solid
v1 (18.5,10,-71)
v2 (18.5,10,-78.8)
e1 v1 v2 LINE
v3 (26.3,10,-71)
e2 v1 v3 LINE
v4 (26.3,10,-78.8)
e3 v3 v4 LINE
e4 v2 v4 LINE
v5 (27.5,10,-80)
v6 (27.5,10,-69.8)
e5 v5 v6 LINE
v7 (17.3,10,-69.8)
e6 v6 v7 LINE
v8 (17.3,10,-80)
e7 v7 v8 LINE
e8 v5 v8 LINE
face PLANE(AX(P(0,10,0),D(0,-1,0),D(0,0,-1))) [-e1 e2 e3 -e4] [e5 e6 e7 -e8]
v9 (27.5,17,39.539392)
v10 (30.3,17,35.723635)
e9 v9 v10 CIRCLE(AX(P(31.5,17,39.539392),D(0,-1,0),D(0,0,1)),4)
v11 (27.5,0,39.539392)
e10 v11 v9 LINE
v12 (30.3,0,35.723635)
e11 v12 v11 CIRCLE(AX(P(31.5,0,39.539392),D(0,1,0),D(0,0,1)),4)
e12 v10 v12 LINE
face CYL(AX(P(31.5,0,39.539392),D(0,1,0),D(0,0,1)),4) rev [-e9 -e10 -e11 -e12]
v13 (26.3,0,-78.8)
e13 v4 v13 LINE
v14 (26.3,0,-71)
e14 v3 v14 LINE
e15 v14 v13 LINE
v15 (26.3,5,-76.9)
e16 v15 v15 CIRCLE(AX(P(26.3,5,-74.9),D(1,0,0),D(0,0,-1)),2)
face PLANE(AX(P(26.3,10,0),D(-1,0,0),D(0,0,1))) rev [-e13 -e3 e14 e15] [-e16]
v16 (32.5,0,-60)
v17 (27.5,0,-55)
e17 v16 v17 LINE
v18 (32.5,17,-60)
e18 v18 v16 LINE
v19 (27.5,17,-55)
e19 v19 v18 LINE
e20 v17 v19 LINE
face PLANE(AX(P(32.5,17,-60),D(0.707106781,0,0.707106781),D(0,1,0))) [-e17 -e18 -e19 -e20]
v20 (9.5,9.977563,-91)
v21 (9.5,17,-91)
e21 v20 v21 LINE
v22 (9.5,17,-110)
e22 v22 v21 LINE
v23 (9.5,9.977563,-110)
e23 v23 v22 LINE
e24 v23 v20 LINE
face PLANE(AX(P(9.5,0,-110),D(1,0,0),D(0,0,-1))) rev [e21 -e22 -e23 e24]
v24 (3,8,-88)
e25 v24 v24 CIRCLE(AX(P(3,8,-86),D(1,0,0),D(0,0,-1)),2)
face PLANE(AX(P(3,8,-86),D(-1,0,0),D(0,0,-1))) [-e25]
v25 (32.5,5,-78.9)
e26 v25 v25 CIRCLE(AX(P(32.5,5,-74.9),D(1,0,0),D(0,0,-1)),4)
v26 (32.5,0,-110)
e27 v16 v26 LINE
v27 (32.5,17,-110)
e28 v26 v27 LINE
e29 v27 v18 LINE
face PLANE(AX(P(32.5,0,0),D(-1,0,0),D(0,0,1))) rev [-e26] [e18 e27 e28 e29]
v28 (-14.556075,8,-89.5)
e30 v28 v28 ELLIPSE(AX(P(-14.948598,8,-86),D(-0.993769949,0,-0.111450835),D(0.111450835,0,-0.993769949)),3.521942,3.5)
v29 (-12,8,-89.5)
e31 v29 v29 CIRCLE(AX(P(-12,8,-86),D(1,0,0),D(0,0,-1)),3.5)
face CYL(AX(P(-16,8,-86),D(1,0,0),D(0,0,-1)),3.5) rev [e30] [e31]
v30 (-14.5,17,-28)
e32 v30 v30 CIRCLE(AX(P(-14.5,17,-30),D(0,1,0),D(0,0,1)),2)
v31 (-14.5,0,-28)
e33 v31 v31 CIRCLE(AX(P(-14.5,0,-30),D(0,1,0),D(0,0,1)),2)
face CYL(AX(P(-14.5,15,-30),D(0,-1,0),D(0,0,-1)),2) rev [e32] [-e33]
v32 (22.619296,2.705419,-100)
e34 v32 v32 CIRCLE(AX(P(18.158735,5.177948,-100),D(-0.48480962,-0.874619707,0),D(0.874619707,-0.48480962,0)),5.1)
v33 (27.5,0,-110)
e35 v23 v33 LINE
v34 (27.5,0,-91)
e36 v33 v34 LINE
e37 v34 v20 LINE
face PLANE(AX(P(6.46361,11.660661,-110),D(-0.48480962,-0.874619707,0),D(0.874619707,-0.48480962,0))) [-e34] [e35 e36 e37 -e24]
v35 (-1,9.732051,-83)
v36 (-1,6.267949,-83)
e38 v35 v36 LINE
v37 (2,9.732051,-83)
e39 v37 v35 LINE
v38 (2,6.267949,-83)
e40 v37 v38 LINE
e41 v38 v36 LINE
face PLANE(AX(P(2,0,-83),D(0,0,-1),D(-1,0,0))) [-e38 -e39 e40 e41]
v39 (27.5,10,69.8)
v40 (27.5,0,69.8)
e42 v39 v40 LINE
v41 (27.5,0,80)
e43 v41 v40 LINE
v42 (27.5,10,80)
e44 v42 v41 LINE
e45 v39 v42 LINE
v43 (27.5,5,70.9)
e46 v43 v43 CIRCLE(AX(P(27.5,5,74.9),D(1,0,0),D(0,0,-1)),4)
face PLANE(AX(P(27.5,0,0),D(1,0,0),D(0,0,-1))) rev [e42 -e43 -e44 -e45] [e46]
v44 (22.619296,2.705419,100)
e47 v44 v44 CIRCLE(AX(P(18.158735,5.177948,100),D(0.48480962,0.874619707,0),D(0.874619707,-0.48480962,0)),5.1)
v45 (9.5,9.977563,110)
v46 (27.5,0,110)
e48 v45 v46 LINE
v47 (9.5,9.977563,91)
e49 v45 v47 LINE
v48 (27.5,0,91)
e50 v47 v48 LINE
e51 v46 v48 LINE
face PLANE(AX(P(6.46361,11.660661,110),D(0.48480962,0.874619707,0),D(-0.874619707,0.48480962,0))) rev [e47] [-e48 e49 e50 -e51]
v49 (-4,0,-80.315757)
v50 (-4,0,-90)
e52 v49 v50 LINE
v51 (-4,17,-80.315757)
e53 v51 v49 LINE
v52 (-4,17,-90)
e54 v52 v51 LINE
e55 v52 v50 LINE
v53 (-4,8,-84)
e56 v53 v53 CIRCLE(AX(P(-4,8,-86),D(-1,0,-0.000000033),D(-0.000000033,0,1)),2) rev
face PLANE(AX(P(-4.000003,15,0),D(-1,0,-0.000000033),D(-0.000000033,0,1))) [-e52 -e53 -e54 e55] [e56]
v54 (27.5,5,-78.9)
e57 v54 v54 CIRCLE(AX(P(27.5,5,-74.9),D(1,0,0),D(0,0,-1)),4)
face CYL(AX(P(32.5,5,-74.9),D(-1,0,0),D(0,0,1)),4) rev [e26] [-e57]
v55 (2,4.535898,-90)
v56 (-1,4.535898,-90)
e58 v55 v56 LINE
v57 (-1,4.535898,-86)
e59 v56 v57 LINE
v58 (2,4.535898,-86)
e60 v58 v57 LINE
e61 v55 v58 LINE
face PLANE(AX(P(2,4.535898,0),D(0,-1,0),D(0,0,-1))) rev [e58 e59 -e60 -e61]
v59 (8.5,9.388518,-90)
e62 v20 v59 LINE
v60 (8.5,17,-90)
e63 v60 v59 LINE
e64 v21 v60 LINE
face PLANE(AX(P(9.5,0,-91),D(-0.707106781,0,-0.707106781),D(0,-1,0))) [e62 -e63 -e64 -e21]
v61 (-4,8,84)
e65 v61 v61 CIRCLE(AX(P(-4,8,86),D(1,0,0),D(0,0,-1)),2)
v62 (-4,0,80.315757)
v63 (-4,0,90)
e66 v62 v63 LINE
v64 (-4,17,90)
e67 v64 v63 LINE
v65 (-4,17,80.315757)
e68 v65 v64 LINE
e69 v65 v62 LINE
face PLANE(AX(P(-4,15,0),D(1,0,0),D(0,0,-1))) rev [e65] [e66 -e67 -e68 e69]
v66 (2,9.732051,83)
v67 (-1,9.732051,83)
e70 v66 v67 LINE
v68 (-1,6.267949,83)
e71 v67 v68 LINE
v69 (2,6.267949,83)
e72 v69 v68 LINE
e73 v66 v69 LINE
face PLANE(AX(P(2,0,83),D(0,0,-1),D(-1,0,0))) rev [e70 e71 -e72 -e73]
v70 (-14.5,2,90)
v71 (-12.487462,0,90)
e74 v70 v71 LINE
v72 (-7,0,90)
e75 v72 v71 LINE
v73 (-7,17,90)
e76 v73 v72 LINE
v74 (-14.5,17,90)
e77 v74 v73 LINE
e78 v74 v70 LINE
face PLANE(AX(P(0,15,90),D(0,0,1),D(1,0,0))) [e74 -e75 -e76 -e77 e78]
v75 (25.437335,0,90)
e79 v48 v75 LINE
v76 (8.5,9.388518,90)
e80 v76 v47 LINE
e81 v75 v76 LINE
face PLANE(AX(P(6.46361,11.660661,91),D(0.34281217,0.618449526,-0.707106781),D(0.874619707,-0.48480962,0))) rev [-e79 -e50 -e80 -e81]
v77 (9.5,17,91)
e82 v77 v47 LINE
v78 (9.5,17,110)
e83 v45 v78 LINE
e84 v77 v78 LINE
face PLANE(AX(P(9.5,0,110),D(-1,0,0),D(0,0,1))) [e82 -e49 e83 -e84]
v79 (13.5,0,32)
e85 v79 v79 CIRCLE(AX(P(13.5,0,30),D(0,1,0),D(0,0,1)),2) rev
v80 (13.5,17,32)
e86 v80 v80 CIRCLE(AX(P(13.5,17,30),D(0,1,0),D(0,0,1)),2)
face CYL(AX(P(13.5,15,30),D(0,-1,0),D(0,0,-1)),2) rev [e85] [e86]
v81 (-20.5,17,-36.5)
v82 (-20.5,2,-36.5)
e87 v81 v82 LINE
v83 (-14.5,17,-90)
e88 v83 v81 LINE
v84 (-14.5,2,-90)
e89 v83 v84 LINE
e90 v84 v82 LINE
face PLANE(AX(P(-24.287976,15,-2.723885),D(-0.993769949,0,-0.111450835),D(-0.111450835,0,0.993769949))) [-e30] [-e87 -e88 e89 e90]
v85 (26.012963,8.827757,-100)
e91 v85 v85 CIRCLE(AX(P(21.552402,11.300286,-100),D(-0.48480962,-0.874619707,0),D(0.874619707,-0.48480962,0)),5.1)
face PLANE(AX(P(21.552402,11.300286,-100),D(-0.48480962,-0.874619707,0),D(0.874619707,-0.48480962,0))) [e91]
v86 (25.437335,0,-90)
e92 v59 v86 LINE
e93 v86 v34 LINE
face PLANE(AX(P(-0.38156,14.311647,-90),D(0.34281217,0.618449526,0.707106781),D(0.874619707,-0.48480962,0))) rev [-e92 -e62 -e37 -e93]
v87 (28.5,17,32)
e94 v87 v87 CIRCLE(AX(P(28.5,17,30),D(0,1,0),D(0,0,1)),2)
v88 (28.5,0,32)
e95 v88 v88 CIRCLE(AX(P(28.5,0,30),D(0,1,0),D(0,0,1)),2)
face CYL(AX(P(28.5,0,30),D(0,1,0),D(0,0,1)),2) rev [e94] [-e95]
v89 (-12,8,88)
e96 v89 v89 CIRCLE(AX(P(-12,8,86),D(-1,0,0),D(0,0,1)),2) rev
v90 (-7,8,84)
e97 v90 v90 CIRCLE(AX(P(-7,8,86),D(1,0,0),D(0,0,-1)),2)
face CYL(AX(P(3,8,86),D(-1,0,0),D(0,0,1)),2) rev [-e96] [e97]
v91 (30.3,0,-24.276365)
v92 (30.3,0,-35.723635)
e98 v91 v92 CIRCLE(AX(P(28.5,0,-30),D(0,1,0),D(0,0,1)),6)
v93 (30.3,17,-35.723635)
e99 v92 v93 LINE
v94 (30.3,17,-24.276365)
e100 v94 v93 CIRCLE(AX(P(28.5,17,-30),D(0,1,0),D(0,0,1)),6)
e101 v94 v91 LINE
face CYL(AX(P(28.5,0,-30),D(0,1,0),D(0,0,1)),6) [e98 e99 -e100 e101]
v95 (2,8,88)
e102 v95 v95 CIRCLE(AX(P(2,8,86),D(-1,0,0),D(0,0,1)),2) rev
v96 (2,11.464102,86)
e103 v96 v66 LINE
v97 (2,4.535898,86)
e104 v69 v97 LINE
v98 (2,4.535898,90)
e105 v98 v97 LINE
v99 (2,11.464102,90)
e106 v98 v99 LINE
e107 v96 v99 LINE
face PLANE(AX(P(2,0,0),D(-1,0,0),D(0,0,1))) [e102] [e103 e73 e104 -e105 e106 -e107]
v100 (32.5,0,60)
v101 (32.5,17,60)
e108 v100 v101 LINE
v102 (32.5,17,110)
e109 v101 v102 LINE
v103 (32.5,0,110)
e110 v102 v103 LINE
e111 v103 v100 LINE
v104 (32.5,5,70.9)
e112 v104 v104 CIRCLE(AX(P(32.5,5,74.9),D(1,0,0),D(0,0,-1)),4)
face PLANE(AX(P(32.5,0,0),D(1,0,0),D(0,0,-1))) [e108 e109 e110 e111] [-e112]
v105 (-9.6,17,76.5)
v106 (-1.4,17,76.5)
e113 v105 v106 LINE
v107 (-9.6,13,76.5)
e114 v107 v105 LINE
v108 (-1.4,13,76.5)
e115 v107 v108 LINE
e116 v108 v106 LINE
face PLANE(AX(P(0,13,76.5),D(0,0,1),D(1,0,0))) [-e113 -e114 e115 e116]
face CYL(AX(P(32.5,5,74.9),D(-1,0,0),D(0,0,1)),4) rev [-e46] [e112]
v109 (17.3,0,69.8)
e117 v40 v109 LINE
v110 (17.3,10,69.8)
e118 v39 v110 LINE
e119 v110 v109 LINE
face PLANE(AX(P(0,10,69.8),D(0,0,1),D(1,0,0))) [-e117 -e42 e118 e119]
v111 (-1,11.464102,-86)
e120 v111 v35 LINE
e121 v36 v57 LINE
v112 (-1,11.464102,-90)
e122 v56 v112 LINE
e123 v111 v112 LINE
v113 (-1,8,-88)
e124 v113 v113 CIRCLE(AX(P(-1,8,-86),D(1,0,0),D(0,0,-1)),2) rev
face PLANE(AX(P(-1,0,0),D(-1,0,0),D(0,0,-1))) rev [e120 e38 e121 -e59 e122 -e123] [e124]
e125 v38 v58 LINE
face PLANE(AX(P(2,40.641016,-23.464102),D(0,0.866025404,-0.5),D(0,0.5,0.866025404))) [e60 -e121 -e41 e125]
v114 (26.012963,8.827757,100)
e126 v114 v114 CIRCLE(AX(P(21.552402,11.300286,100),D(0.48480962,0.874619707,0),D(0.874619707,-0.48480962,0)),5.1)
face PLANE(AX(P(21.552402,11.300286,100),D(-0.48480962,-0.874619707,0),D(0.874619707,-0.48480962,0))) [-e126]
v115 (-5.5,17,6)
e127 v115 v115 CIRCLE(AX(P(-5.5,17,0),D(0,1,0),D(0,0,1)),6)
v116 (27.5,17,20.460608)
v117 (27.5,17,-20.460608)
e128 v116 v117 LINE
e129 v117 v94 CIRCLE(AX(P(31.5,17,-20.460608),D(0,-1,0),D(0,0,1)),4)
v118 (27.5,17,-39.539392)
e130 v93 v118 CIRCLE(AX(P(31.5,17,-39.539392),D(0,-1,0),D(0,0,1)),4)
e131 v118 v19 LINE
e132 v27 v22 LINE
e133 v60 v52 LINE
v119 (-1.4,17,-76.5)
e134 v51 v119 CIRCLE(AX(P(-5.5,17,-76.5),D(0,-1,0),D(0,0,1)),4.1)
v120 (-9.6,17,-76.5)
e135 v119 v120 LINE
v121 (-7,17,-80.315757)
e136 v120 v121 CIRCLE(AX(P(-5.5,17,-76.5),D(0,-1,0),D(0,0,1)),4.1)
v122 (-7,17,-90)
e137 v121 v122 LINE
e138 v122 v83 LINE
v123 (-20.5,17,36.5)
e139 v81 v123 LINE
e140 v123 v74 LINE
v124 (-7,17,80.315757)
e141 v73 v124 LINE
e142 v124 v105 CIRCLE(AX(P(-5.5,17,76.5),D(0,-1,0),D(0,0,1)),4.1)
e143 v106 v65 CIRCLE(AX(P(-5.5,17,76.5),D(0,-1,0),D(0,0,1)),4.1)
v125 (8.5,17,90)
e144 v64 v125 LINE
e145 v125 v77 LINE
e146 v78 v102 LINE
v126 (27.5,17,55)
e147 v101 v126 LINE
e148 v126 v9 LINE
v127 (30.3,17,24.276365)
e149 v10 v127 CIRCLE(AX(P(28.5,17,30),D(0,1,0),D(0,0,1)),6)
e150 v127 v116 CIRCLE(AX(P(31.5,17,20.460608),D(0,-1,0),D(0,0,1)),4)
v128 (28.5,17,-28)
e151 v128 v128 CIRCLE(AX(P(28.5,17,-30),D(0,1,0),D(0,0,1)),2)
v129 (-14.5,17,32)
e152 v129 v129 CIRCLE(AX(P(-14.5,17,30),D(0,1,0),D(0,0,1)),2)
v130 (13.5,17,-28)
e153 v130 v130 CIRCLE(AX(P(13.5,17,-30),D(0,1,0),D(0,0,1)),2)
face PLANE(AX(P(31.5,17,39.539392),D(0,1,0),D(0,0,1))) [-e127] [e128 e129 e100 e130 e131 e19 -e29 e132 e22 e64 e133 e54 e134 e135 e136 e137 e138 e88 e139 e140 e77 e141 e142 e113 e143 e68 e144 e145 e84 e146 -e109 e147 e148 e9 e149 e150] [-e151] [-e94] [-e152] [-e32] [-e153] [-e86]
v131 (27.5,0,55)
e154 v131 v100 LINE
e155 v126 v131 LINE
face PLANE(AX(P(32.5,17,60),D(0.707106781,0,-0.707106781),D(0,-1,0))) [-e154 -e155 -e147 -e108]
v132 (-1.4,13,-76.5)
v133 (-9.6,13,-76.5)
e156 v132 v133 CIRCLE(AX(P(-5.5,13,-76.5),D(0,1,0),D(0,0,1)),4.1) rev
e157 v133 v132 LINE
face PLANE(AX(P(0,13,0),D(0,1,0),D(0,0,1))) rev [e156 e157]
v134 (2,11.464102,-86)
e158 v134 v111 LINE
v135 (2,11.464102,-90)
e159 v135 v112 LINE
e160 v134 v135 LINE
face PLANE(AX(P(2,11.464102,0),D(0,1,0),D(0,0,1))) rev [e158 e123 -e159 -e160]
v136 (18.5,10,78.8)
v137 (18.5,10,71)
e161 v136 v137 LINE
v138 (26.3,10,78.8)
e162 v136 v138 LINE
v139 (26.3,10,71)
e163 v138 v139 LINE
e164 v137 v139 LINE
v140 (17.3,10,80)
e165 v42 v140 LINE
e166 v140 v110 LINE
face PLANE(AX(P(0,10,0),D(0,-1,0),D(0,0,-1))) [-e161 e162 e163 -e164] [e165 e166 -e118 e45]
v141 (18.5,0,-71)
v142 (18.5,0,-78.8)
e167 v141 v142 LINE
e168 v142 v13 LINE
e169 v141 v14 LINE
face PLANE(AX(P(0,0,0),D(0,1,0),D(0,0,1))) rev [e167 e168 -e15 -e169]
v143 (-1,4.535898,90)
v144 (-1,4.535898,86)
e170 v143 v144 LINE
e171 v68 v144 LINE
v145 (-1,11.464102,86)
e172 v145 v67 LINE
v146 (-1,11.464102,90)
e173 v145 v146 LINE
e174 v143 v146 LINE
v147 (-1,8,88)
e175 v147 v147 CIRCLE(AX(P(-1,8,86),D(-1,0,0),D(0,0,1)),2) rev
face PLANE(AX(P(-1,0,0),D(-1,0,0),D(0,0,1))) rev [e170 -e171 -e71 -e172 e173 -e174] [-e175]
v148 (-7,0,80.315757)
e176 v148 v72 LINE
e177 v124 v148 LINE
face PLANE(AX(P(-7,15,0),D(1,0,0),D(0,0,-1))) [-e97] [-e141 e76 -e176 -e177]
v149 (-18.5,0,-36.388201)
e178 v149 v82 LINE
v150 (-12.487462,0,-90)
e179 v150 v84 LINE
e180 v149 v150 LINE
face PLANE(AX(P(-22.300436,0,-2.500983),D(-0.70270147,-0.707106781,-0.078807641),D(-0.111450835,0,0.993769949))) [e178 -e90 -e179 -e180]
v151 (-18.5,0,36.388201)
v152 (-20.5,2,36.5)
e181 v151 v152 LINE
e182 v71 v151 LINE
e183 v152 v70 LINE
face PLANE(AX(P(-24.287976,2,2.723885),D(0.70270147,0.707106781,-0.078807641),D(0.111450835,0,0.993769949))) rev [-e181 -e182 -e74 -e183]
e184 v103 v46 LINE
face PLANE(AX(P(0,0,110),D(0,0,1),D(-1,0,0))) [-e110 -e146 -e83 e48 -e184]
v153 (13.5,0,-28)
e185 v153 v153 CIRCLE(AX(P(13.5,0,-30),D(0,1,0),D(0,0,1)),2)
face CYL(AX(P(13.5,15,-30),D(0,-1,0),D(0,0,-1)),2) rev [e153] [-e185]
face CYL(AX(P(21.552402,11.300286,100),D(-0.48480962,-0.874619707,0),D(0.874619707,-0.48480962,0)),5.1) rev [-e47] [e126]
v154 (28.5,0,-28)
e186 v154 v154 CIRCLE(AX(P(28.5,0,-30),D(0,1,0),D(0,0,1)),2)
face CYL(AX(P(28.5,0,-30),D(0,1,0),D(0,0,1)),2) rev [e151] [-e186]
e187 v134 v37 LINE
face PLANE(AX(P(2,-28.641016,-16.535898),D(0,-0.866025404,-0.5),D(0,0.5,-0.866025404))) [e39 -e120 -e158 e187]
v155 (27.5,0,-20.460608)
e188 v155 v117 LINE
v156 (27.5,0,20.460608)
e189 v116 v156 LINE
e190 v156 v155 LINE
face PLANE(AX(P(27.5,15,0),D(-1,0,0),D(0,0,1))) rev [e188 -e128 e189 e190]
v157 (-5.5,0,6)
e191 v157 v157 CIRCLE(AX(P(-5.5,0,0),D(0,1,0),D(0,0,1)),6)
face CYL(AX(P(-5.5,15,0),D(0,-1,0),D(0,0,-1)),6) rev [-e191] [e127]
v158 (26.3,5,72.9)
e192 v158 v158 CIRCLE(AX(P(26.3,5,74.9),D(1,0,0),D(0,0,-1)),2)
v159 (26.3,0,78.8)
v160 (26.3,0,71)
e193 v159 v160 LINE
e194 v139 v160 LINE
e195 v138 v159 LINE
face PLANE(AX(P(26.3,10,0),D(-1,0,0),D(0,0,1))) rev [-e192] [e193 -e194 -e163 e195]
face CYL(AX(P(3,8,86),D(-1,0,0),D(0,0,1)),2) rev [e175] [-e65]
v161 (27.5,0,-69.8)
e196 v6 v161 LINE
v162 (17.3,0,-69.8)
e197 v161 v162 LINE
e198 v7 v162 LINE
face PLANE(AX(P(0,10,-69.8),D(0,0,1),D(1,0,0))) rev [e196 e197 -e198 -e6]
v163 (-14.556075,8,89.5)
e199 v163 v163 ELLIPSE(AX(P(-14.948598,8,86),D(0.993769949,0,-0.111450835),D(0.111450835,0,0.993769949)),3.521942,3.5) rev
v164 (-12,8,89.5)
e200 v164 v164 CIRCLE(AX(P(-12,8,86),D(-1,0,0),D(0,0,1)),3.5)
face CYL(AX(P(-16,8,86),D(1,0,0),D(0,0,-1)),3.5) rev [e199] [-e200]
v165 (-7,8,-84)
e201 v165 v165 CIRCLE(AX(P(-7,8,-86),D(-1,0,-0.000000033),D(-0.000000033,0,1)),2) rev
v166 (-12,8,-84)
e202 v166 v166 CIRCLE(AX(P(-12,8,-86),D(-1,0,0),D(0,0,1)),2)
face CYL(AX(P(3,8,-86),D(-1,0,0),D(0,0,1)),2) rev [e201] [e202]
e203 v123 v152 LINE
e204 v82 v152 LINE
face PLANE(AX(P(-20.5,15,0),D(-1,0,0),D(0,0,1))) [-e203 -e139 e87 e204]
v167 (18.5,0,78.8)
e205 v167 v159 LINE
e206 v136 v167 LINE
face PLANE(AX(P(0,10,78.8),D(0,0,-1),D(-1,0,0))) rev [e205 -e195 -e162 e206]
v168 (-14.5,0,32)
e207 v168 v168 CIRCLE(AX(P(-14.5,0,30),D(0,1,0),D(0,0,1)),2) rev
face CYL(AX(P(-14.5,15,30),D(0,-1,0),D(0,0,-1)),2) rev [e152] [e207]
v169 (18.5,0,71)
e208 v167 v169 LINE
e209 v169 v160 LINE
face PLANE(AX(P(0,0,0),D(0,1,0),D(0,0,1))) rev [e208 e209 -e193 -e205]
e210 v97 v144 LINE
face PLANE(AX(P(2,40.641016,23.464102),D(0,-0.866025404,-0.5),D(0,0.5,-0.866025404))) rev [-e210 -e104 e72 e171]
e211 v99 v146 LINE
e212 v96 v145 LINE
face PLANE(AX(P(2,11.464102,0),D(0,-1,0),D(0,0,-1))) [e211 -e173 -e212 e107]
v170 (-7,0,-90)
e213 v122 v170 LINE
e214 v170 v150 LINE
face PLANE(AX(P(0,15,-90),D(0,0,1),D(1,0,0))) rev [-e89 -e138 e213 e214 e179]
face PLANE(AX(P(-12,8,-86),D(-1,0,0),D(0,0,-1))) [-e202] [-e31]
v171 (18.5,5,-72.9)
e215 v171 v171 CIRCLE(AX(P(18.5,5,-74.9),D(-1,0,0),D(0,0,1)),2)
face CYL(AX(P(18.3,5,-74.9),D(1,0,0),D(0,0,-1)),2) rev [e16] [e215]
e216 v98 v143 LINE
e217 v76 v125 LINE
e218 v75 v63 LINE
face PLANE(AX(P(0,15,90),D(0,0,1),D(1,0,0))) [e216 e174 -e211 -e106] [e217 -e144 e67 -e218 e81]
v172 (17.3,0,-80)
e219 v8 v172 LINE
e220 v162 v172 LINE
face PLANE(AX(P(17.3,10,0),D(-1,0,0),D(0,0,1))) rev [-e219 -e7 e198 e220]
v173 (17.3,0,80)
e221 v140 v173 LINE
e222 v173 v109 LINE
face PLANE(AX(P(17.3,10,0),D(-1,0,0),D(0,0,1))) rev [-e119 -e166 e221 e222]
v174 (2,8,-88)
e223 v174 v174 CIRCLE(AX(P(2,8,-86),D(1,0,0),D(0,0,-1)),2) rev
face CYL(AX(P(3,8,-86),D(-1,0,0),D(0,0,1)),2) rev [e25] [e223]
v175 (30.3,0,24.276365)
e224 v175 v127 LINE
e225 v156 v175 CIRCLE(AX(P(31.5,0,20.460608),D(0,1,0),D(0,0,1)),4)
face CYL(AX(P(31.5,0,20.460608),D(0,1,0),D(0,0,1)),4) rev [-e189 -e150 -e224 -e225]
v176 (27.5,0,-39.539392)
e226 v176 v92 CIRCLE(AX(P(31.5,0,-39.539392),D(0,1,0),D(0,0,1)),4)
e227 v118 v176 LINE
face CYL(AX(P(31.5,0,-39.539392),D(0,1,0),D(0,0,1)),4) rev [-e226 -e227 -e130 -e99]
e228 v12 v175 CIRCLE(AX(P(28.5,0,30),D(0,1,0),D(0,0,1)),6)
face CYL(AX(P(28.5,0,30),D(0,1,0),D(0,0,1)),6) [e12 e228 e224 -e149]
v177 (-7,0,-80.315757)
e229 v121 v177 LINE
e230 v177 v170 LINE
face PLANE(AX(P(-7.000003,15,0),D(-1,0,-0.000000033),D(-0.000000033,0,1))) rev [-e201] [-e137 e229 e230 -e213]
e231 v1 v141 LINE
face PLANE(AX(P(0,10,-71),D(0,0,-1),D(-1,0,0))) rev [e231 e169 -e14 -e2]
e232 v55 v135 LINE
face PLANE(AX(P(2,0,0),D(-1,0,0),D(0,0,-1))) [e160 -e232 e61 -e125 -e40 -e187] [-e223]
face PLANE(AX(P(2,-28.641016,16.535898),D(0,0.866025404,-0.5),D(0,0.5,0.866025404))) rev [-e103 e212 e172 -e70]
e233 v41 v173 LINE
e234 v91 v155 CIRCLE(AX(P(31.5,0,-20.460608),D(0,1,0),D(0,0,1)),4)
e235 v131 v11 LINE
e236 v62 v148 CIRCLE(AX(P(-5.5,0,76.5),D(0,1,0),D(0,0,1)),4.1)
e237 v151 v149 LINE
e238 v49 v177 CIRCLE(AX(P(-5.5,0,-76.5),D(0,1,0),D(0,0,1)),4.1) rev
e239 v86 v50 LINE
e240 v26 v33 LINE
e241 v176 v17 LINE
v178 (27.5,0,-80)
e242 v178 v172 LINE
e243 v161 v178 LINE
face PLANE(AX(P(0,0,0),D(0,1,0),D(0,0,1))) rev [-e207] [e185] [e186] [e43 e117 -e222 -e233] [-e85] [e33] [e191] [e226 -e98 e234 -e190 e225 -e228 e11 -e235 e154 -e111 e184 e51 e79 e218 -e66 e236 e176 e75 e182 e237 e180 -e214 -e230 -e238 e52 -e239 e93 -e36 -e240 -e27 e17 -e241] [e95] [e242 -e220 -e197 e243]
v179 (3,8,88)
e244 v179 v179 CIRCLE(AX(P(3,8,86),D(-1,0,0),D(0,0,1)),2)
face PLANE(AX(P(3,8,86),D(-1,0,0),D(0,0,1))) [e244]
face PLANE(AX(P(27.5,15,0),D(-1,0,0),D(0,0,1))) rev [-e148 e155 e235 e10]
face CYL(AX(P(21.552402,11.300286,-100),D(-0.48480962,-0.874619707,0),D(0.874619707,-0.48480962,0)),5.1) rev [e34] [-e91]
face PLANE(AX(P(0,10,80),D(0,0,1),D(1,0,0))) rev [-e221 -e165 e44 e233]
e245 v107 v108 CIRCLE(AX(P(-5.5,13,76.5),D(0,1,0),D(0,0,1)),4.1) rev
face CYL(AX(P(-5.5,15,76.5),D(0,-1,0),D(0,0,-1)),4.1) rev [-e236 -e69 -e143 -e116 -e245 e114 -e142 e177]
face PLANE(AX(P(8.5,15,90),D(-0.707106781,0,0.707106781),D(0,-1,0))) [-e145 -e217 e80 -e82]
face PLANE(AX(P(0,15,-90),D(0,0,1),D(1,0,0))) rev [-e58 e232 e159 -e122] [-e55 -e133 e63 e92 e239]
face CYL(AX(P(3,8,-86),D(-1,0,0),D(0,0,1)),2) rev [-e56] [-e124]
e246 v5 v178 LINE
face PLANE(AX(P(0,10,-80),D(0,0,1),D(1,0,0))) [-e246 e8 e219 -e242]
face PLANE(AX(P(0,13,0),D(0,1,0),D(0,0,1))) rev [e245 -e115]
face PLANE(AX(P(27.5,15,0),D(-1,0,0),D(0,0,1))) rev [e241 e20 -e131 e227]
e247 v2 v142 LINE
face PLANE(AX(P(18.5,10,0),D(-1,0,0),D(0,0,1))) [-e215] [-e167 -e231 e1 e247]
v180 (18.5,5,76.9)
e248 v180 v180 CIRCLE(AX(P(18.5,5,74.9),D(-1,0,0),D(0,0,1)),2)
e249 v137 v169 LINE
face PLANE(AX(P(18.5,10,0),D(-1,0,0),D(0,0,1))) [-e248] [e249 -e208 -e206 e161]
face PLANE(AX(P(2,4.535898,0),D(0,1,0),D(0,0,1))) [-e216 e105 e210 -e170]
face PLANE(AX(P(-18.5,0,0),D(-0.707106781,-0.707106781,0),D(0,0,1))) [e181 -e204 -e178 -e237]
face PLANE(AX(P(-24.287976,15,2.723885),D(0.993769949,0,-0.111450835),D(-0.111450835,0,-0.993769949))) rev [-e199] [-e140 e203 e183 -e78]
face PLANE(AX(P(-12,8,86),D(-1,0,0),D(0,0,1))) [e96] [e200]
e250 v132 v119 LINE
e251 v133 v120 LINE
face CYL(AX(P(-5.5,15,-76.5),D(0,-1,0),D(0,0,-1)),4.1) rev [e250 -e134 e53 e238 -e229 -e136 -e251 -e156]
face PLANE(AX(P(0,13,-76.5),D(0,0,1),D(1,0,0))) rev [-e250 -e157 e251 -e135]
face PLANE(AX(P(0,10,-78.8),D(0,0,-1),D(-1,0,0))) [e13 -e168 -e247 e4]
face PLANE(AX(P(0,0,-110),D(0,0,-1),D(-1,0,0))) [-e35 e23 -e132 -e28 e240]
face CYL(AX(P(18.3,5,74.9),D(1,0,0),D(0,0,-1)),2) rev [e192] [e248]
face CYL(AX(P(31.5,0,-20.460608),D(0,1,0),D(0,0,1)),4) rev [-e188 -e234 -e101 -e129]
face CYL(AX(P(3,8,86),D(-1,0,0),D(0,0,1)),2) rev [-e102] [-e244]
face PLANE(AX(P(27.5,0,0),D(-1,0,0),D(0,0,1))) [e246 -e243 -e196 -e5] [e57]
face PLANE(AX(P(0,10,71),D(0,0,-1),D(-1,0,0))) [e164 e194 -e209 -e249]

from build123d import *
from build123d.topology import SkipClean

# Parameters (mm, degrees)
SZKIC1_R                    = 2
DODANIE_WYCI_GNI_CIE1_DEPTH = 15
DODANIE_WYCI_GNI_CIE3_START = -2
DODANIE_WYCI_GNI_CIE3_DEPTH = 2
DODANIE_WYCI_GNI_CIE4_DEPTH = 15
WYTNIJ_WYCI_GNI_CIE1_DEPTH  = 15
ZAOKR_GLENIE1_R             = 4
SFAZOWANIE1_SIZE            = 2
WYTNIJ_WYCI_GNI_CIE3_START  = -7
SZKIC8_R                    = 2
WYTNIJ_WYCI_GNI_CIE3_DEPTH  = 107.031561
WYTNIJ_WYCI_GNI_CIE4_START  = 8
SZKIC9_R                    = 3.5
WYTNIJ_WYCI_GNI_CIE4_DEPTH  = 4
WYTNIJ_WYCI_GNI_CIE5_START  = -6
SZKIC10_R                   = 2
WYTNIJ_WYCI_GNI_CIE5_DEPTH  = 3
SZKIC12_W                   = 10.2
SZKIC12_H                   = 10.2
SZKIC12_W_2                 = 7.8
SZKIC12_H_2                 = 7.8
WYTNIJ_WYCI_GNI_CIE7_DEPTH  = 10
SZKIC13_R                   = 2
WYTNIJ_WYCI_GNI_CIE8_DEPTH  = 8
DODANIE_WYCI_GNI_CIE5_DEPTH = 20
SZKIC15_R                   = 5.1
WYTNIJ_WYCI_GNI_CIE9_DEPTH  = 7
SFAZOWANIE2_SIZE            = 1
SZKIC17_R                   = 2
SZKIC17_R_2                 = 6
DODANIE_WYCI_GNI_CIE6_DEPTH = 2
SZKIC18_W                   = 50
SZKIC18_H                   = 17
SZKIC18_R                   = 4
DODANIE_WYCI_GNI_CIE7_DEPTH = 5
SFAZOWANIE3_SIZE            = 5


# Some blends are built 0.0001 mm under size
with BuildPart() as part:
    # Szkic1 → Dodanie-wyciągnięcie1 (new body)
    # profile 1 of 2: a face of its own
    with BuildSketch(Plane(origin=(0, 0, 0), x_dir=(1, 0, 0), z_dir=(0, 1, 0))):
        with BuildLine():
            Line((-11.5, 0), (-20.5, 0))
            Line((-20.5, 0), (-20.5, -36.5))
            Line((-20.5, -36.5), (-14.5, -90))
            Line((-14.5, -90), (-7, -90))
            Line((-7, -90), (-7, -80.315757))
            ThreePointArc((-7, -80.315757), (-7.808679, -73.111785), (-1.4, -76.5))
            ThreePointArc((-1.4, -76.5), (-2.111785, -78.808679), (-4, -80.315757))
            Line((-4, -80.315757), (-4, -90))
            Line((-4, -90), (27.5, -90))
            Line((27.5, -90), (27.5, 0))
            Line((27.5, 0), (0.5, 0))
            ThreePointArc((0.5, 0), (-5.5, -6), (-11.5, 0))
        make_face()
        with Locations(Location((-14.5, -30, 0), (0, 0, 270))):
            Circle(SZKIC1_R, mode=Mode.SUBTRACT)
        with Locations(Location((13.5, -30, 0), (0, 0, 270))):
            Circle(SZKIC1_R, mode=Mode.SUBTRACT)
    # profile 2 of 2: a face of its own
    with BuildSketch(Plane(origin=(0, 0, 0), x_dir=(1, 0, 0), z_dir=(0, 1, 0))):
        with BuildLine():
            Line((-14.5, 90), (-20.5, 36.5))
            Line((-20.5, 36.5), (-20.5, 0))
            Line((-20.5, 0), (-11.5, 0))
            ThreePointArc((-11.5, 0), (-5.5, 6), (0.5, 0))
            Line((0.5, 0), (27.5, 0))
            Line((27.5, 0), (27.5, 90))
            Line((27.5, 90), (-4, 90))
            Line((-4, 90), (-4, 80.315757))
            ThreePointArc((-4, 80.315757), (-2.111785, 78.808679), (-1.4, 76.5))
            ThreePointArc((-1.4, 76.5), (-7.808679, 73.111785), (-7, 80.315757))
            Line((-7, 80.315757), (-7, 90))
            Line((-7, 90), (-14.5, 90))
        make_face()
        with Locations(Location((-14.5, 30, 0), (0, 0, 270))):
            Circle(SZKIC1_R, mode=Mode.SUBTRACT)
        with Locations(Location((13.5, 30, 0), (0, 0, 270))):
            Circle(SZKIC1_R, mode=Mode.SUBTRACT)
    extrude(amount=DODANIE_WYCI_GNI_CIE1_DEPTH)

    # Szkic3 → Dodanie-wyciągnięcie3 (add)
    with BuildSketch(Plane(origin=(0, 15, 0), x_dir=(1, 0, 0), z_dir=(0, 1, 0)).offset(DODANIE_WYCI_GNI_CIE3_START)):
        with BuildLine():
            ThreePointArc((-1.4, -76.5), (-5.5, -72.4), (-9.6, -76.5))
            Line((-9.6, -76.5), (-1.4, -76.5))
        make_face()
        with BuildLine():
            Line((-1.4, 76.5), (-9.6, 76.5))
            ThreePointArc((-9.6, 76.5), (-5.5, 72.4), (-1.4, 76.5))
        make_face()
    extrude(amount=DODANIE_WYCI_GNI_CIE3_DEPTH)

    # Szkic4 → Dodanie-wyciągnięcie4 (add)
    with BuildSketch(Plane(origin=(0, 15, 0), x_dir=(1, 0, 0), z_dir=(0, 1, 0))):
        with BuildLine():
            ThreePointArc((27.5, -28.267949), (29.5, -28.267949), (30.5, -30))
            ThreePointArc((30.5, -30), (29.5, -31.732051), (27.5, -31.732051))
            Line((27.5, -31.732051), (27.5, -35.91608))
            ThreePointArc((27.5, -35.91608), (32.372983, -34.582576), (34.5, -30))
            ThreePointArc((34.5, -30), (32.372983, -25.417424), (27.5, -24.08392))
            Line((27.5, -24.08392), (27.5, -28.267949))
        make_face()
        with BuildLine():
            ThreePointArc((27.5, -31.732051), (26.5, -30), (27.5, -28.267949))
            Line((27.5, -28.267949), (27.5, -24.08392))
            ThreePointArc((27.5, -24.08392), (22.5, -30), (27.5, -35.91608))
            Line((27.5, -35.91608), (27.5, -31.732051))
        make_face()
        with BuildLine():
            ThreePointArc((27.5, 35.91608), (22.5, 30), (27.5, 24.08392))
            Line((27.5, 24.08392), (27.5, 28.267949))
            ThreePointArc((27.5, 28.267949), (26.5, 30), (27.5, 31.732051))
            Line((27.5, 31.732051), (27.5, 35.91608))
        make_face()
        with BuildLine():
            Line((27.5, 28.267949), (27.5, 24.08392))
            ThreePointArc((27.5, 24.08392), (32.372983, 25.417424), (34.5, 30))
            ThreePointArc((34.5, 30), (32.372983, 34.582576), (27.5, 35.91608))
            Line((27.5, 35.91608), (27.5, 31.732051))
            ThreePointArc((27.5, 31.732051), (29.5, 31.732051), (30.5, 30))
            ThreePointArc((30.5, 30), (29.5, 28.267949), (27.5, 28.267949))
        make_face()
    extrude(amount=-DODANIE_WYCI_GNI_CIE4_DEPTH)

    # Szkic5 → Wytnij-wyciągnięcie1 (cut)
    with SkipClean():  # the faces are left unmerged after this step: merging them gives an invalid solid
        with BuildSketch(Plane(origin=(0, 15, 0), x_dir=(1, 0, 0), z_dir=(0, 1, 0))):
            with BuildLine():
                ThreePointArc((27.5, -28.267949), (30.5, -30), (27.5, -31.732051))
                Line((27.5, -31.732051), (27.5, -28.267949))
            make_face()
            with BuildLine():
                Line((27.5, -28.267949), (27.5, -31.732051))
                ThreePointArc((27.5, -31.732051), (29.5, -31.732051), (30.5, -30))
                ThreePointArc((30.5, -30), (29.5, -28.267949), (27.5, -28.267949))
            make_face()
            with BuildLine():
                ThreePointArc((27.5, -28.267949), (26.5, -30), (27.5, -31.732051))
                Line((27.5, -31.732051), (27.5, -28.267949))
            make_face()
            with BuildLine():
                Line((27.5, 31.732051), (27.5, 28.267949))
                ThreePointArc((27.5, 28.267949), (29.5, 28.267949), (30.5, 30))
                ThreePointArc((30.5, 30), (29.5, 31.732051), (27.5, 31.732051))
            make_face()
            with BuildLine():
                ThreePointArc((27.5, 31.732051), (26.5, 30), (27.5, 28.267949))
                Line((27.5, 28.267949), (27.5, 31.732051))
            make_face()
            with BuildLine():
                ThreePointArc((27.5, 31.732051), (30.5, 30), (27.5, 28.267949))
                Line((27.5, 28.267949), (27.5, 31.732051))
            make_face()
        extrude(amount=-WYTNIJ_WYCI_GNI_CIE1_DEPTH, mode=Mode.SUBTRACT)

    # Zaokrąglenie1
    zaokr_glenie1_edges = [part.edges().sort_by_distance(p)[0] for p in [
        (27.5, 7.5, -35.91608),
        (27.5, 7.5, 35.91608),
        (27.5, 7.5, 24.08392),
        (27.5, 7.5, -24.08392),
    ]]
    fillet(zaokr_glenie1_edges, radius=ZAOKR_GLENIE1_R)

    # Sfazowanie1
    sfazowanie1_edges = [part.edges().sort_by_distance(p)[0] for p in [
        (-17.5, 0, 63.25),
        (-20.5, 0, 0),
        (-17.5, 0, -63.25),
    ]]
    chamfer(sfazowanie1_edges, length=SFAZOWANIE1_SIZE)

    # Szkic8 → Wytnij-wyciągnięcie3 (cut)
    with SkipClean():  # the faces are left unmerged after this step: merging them gives an invalid solid
        with BuildSketch(Plane.ZY.offset(4).offset(WYTNIJ_WYCI_GNI_CIE3_START)):
            with Locations((86, 8)):
                Circle(SZKIC8_R)
        wytnij_wyci_gni_cie3 = extrude(amount=WYTNIJ_WYCI_GNI_CIE3_DEPTH, mode=Mode.SUBTRACT)

    # Szkic9 → Wytnij-wyciągnięcie4 (cut)
    with SkipClean():  # the faces are left unmerged after this step: merging them gives an invalid solid
        with BuildSketch(Plane.ZY.offset(4).offset(WYTNIJ_WYCI_GNI_CIE4_START)):
            with Locations((86, 8)):
                Circle(SZKIC9_R)
        wytnij_wyci_gni_cie4 = extrude(amount=WYTNIJ_WYCI_GNI_CIE4_DEPTH, mode=Mode.SUBTRACT)

    # Szkic10 → Wytnij-wyciągnięcie5 (cut)
    # profile 1 of 2: a face of its own
    with SkipClean():  # the faces are left unmerged after this step: merging them gives an invalid solid
        with BuildSketch(Plane.ZY.offset(4).offset(WYTNIJ_WYCI_GNI_CIE5_START)):
            Polygon((89, 6.267949), (89, 9.732051), (86, 11.464102), (83, 9.732051), (83, 6.267949), (86, 4.535898), align=None)
            with Locations((86, 8)):
                Circle(SZKIC10_R, mode=Mode.SUBTRACT)
        # profile 2 of 2: a face of its own
        with BuildSketch(Plane.ZY.offset(4).offset(WYTNIJ_WYCI_GNI_CIE5_START)):
            Polygon((90, 11.464102), (86, 11.464102), (89, 9.732051), (89, 6.267949), (86, 4.535898), (90, 4.535898), align=None)
        wytnij_wyci_gni_cie5 = extrude(amount=WYTNIJ_WYCI_GNI_CIE5_DEPTH, mode=Mode.SUBTRACT)

    # Lustro2: Wytnij-wyciągnięcie3, Wytnij-wyciągnięcie4, Wytnij-wyciągnięcie5 across plane
    with SkipClean():  # the faces are left unmerged after this step: merging them gives an invalid solid
        add(wytnij_wyci_gni_cie3.mirror(Plane.XY), mode=Mode.SUBTRACT)
        add(wytnij_wyci_gni_cie4.mirror(Plane.XY), mode=Mode.SUBTRACT)
        add(wytnij_wyci_gni_cie5.mirror(Plane.XY), mode=Mode.SUBTRACT)

    # Szkic12 → Wytnij-wyciągnięcie7 (cut)
    # profile 1 of 2: a face of its own
    with SkipClean():  # the faces are left unmerged after this step: merging them gives an invalid solid
        with BuildSketch(Plane.XZ):
            with Locations((22.4, 74.9)):
                Rectangle(SZKIC12_W, SZKIC12_H)
            with Locations((22.4, 74.9)):
                Rectangle(SZKIC12_W_2, SZKIC12_H_2, mode=Mode.SUBTRACT)
        # profile 2 of 2: a face of its own
        with BuildSketch(Plane.XZ):
            with Locations((22.4, -74.9)):
                Rectangle(SZKIC12_W, SZKIC12_H)
            with Locations((22.4, -74.9)):
                Rectangle(SZKIC12_W_2, SZKIC12_H_2, mode=Mode.SUBTRACT)
        extrude(amount=-WYTNIJ_WYCI_GNI_CIE7_DEPTH, mode=Mode.SUBTRACT)

    # Szkic13 → Wytnij-wyciągnięcie8 (cut)
    with SkipClean():  # the faces are left unmerged after this step: merging them gives an invalid solid
        with BuildSketch(Plane(origin=(26.3, 0, 0), x_dir=(0, 0, -1), z_dir=(1, 0, 0))):
            with Locations((74.9, 5)):
                Circle(SZKIC13_R)
            with Locations((-74.9, 5)):
                Circle(SZKIC13_R)
        extrude(amount=-WYTNIJ_WYCI_GNI_CIE8_DEPTH, mode=Mode.SUBTRACT)

    # Szkic14 → Dodanie-wyciągnięcie5 (add)
    with SkipClean():  # the faces are left unmerged after this step: merging them gives an invalid solid
        with BuildSketch(Plane(origin=(0, 0, -90), x_dir=(-1, 0, 0), z_dir=(0, 0, -1))):
            Polygon((-27.5, 15), (-27.5, 0), (-9.5, 9.977563), (-9.5, 15), align=None)
        dodanie_wyci_gni_cie5 = extrude(amount=DODANIE_WYCI_GNI_CIE5_DEPTH)

    # Szkic15 → Wytnij-wyciągnięcie9 (cut)
    with SkipClean():  # the faces are left unmerged after this step: merging them gives an invalid solid
        with BuildSketch(Plane(origin=(6.46361, 11.660661, 0), x_dir=(0.8746197071393933, -0.48480962024634155, 0), z_dir=(-0.48480962024634155, -0.8746197071393933, 0))):
            with Locations((13.371669, -100)):
                Circle(SZKIC15_R)
        wytnij_wyci_gni_cie9 = extrude(amount=-WYTNIJ_WYCI_GNI_CIE9_DEPTH, mode=Mode.SUBTRACT)

    # Lustro4: Dodanie-wyciągnięcie5, Wytnij-wyciągnięcie9 across plane
    with SkipClean():  # the faces are left unmerged after this step: merging them gives an invalid solid
        add(dodanie_wyci_gni_cie5.mirror(Plane.XY))
        add(wytnij_wyci_gni_cie9.mirror(Plane.XY), mode=Mode.SUBTRACT)

    # Sfazowanie2
    # the kernel refuses this chamfer: 1 mm, written as the material it adds along each edge
    with BuildSketch(Plane(origin=(9.5, 7.40588, -90), x_dir=(-0.999621916911297, 0, 0.0274958766105822), z_dir=(0, 1, 0))) as sfazowanie2_piece_1_section:
        Polygon((SFAZOWANIE2_SIZE * 0.999621916911, -SFAZOWANIE2_SIZE * 0.0274958766106), (-SFAZOWANIE2_SIZE * 0.0274958766106, -SFAZOWANIE2_SIZE * 0.999621916911), (0, 0), align=None)
    sfazowanie2_piece_1 = extrude(amount=7.59412, mode=Mode.PRIVATE)
    sfazowanie2_piece_1 = split(sfazowanie2_piece_1, bisect_by=Plane(origin=(8.150565, 10.725567, -90.333682), z_dir=(0.4848096202463415, 0.8746197071393933, 0)), keep=Keep.TOP, mode=Mode.PRIVATE)
    add(sfazowanie2_piece_1)
    with BuildSketch(Plane(origin=(29.749245, -1.246777, -90), x_dir=(-0.4846263219276858, -0.8742890282190773, 0.02749587661058218), z_dir=(-0.8746197071393933, 0.4848096202463415, 0))) as sfazowanie2_piece_2_section:
        Polygon((SFAZOWANIE2_SIZE * 0.999621916911, -SFAZOWANIE2_SIZE * 0.0274958766106), (-SFAZOWANIE2_SIZE * 0.0274958766106, -SFAZOWANIE2_SIZE * 0.999621916911), (0, 0), align=None)
    sfazowanie2_piece_2 = extrude(amount=25.723739, mode=Mode.PRIVATE)
    sfazowanie2_piece_2 = split(sfazowanie2_piece_2, bisect_by=Plane(origin=(18.166954, 0, -90.333808), z_dir=(0, 1, 0)), keep=Keep.TOP, mode=Mode.PRIVATE)
    sfazowanie2_piece_2 = split(sfazowanie2_piece_2, bisect_by=Plane(origin=(9.5, 4.804938, -90.333808), z_dir=(1, 0, 0)), keep=Keep.TOP, mode=Mode.PRIVATE)
    sfazowanie2_piece_2 = split(sfazowanie2_piece_2, bisect_by=Plane(origin=(27.5, 4.804938, -90.333808), z_dir=(-1, 0, 0)), keep=Keep.TOP, mode=Mode.PRIVATE)
    add(sfazowanie2_piece_2)
    with BuildSketch(Plane(origin=(29.749245, -1.246777, 90), x_dir=(-0.48462632192768573, -0.8742890282190774, -0.027495876610582216), z_dir=(-0.8746197071393933, 0.4848096202463415, 0))) as sfazowanie2_piece_3_section:
        Polygon((SFAZOWANIE2_SIZE * 0.999621916911, SFAZOWANIE2_SIZE * 0.0274958766106), (-SFAZOWANIE2_SIZE * 0.0274958766106, SFAZOWANIE2_SIZE * 0.999621916911), (0, 0), align=None)
    sfazowanie2_piece_3 = extrude(amount=25.723739, mode=Mode.PRIVATE)
    sfazowanie2_piece_3 = split(sfazowanie2_piece_3, bisect_by=Plane(origin=(18.166954, 0, 90.333808), z_dir=(0, 1, 0)), keep=Keep.TOP, mode=Mode.PRIVATE)
    sfazowanie2_piece_3 = split(sfazowanie2_piece_3, bisect_by=Plane(origin=(27.5, 4.804938, 90.333808), z_dir=(-1, 0, 0)), keep=Keep.TOP, mode=Mode.PRIVATE)
    sfazowanie2_piece_3 = split(sfazowanie2_piece_3, bisect_by=Plane(origin=(9.5, 4.804938, 90.333808), z_dir=(1, 0, 0)), keep=Keep.TOP, mode=Mode.PRIVATE)
    add(sfazowanie2_piece_3)
    with BuildSketch(Plane(origin=(9.5, 7.40588, 90), x_dir=(-0.999621916911297, 0, -0.0274958766105822), z_dir=(0, 1, 0))) as sfazowanie2_piece_4_section:
        Polygon((SFAZOWANIE2_SIZE * 0.999621916911, SFAZOWANIE2_SIZE * 0.0274958766106), (-SFAZOWANIE2_SIZE * 0.0274958766106, SFAZOWANIE2_SIZE * 0.999621916911), (0, 0), align=None)
    sfazowanie2_piece_4 = extrude(amount=7.59412, mode=Mode.PRIVATE)
    sfazowanie2_piece_4 = split(sfazowanie2_piece_4, bisect_by=Plane(origin=(8.150565, 10.725567, 90.333682), z_dir=(0.4848096202463415, 0.8746197071393933, 0)), keep=Keep.TOP, mode=Mode.PRIVATE)
    add(sfazowanie2_piece_4)
    with BuildSketch(Plane(origin=(9.5, 7.40588, -90), x_dir=(-0.999621916911297, 0, 0.0274958766105822), z_dir=(0, 1, 0))) as sfazowanie2_piece_5a_section:
        Polygon((SFAZOWANIE2_SIZE * 0.999621916911, -SFAZOWANIE2_SIZE * 0.0274958766106), (-SFAZOWANIE2_SIZE * 0.0274958766106, -SFAZOWANIE2_SIZE * 0.999621916911), (0, 0), align=None)
    sfazowanie2_piece_5a = extrude(amount=7.59412, mode=Mode.PRIVATE)
    sfazowanie2_piece_5a = split(sfazowanie2_piece_5a, bisect_by=Plane(origin=(9.742914, 9.842913, -90.322962), z_dir=(-0.4848096202463415, -0.8746197071393933, 0)), keep=Keep.TOP, mode=Mode.PRIVATE)
    with BuildSketch(Plane(origin=(29.749245, -1.246777, -90), x_dir=(-0.4846263219276858, -0.8742890282190773, 0.02749587661058218), z_dir=(-0.8746197071393933, 0.4848096202463415, 0))) as sfazowanie2_piece_5b_section:
        Polygon((SFAZOWANIE2_SIZE * 0.999621916911, -SFAZOWANIE2_SIZE * 0.0274958766106), (-SFAZOWANIE2_SIZE * 0.0274958766106, -SFAZOWANIE2_SIZE * 0.999621916911), (0, 0), align=None)
    sfazowanie2_piece_5b = extrude(amount=25.723739, mode=Mode.PRIVATE)
    sfazowanie2_piece_5b = split(sfazowanie2_piece_5b, bisect_by=Plane(origin=(9.5, 10.2553, -90.322962), z_dir=(-1, 0, 0)), keep=Keep.TOP, mode=Mode.PRIVATE)
    sfazowanie2_piece_5 = sfazowanie2_piece_5a & sfazowanie2_piece_5b
    add(sfazowanie2_piece_5)
    with BuildSketch(Plane(origin=(29.749245, -1.246777, 90), x_dir=(-0.48462632192768573, -0.8742890282190774, -0.027495876610582216), z_dir=(-0.8746197071393933, 0.4848096202463415, 0))) as sfazowanie2_piece_6a_section:
        Polygon((SFAZOWANIE2_SIZE * 0.999621916911, SFAZOWANIE2_SIZE * 0.0274958766106), (-SFAZOWANIE2_SIZE * 0.0274958766106, SFAZOWANIE2_SIZE * 0.999621916911), (0, 0), align=None)
    sfazowanie2_piece_6a = extrude(amount=25.723739, mode=Mode.PRIVATE)
    sfazowanie2_piece_6a = split(sfazowanie2_piece_6a, bisect_by=Plane(origin=(9.5, 10.2553, 90.322962), z_dir=(-1, 0, 0)), keep=Keep.TOP, mode=Mode.PRIVATE)
    with BuildSketch(Plane(origin=(9.5, 7.40588, 90), x_dir=(-0.999621916911297, 0, -0.0274958766105822), z_dir=(0, 1, 0))) as sfazowanie2_piece_6b_section:
        Polygon((SFAZOWANIE2_SIZE * 0.999621916911, SFAZOWANIE2_SIZE * 0.0274958766106), (-SFAZOWANIE2_SIZE * 0.0274958766106, SFAZOWANIE2_SIZE * 0.999621916911), (0, 0), align=None)
    sfazowanie2_piece_6b = extrude(amount=7.59412, mode=Mode.PRIVATE)
    sfazowanie2_piece_6b = split(sfazowanie2_piece_6b, bisect_by=Plane(origin=(9.742914, 9.842913, 90.322962), z_dir=(-0.4848096202463415, -0.8746197071393933, 0)), keep=Keep.TOP, mode=Mode.PRIVATE)
    sfazowanie2_piece_6 = sfazowanie2_piece_6a & sfazowanie2_piece_6b
    add(sfazowanie2_piece_6)

    # Szkic17 → Dodanie-wyciągnięcie6 (add)
    with BuildSketch(Plane(origin=(0, 15, 0), x_dir=(1, 0, 0), z_dir=(0, 1, 0))):
        with BuildLine():
            Line((27.5, -110), (27.5, -39.539392))
            ThreePointArc((27.5, -39.539392), (28.275097, -37.17296), (30.3, -35.723635))
            ThreePointArc((30.3, -35.723635), (34.5, -30), (30.3, -24.276365))
            ThreePointArc((30.3, -24.276365), (28.275097, -22.82704), (27.5, -20.460608))
            Line((27.5, -20.460608), (27.5, 20.460608))
            ThreePointArc((27.5, 20.460608), (28.275097, 22.82704), (30.3, 24.276365))
            ThreePointArc((30.3, 24.276365), (34.5, 30), (30.3, 35.723635))
            ThreePointArc((30.3, 35.723635), (28.275097, 37.17296), (27.5, 39.539392))
            Line((27.5, 39.539392), (27.5, 110))
            Line((27.5, 110), (9.5, 110))
            Line((9.5, 110), (9.5, 91))
            Line((9.5, 91), (8.5, 90))
            Line((8.5, 90), (-4, 90))
            Line((-4, 90), (-4, 80.315757))
            ThreePointArc((-4, 80.315757), (-2.111785, 78.808679), (-1.4, 76.5))
            Line((-1.4, 76.5), (-9.6, 76.5))
            ThreePointArc((-9.6, 76.5), (-8.888215, 78.808679), (-7, 80.315757))
            Line((-7, 80.315757), (-7, 90))
            Line((-7, 90), (-14.5, 90))
            Line((-14.5, 90), (-20.5, 36.5))
            Line((-20.5, 36.5), (-20.5, -36.5))
            Line((-20.5, -36.5), (-14.5, -90))
            Line((-14.5, -90), (-7, -90))
            Line((-7, -90), (-7, -80.315757))
            ThreePointArc((-7, -80.315757), (-8.888215, -78.808679), (-9.6, -76.5))
            Line((-9.6, -76.5), (-1.4, -76.5))
            ThreePointArc((-1.4, -76.5), (-2.111785, -78.808679), (-4, -80.315757))
            Line((-4, -80.315757), (-4, -90))
            Line((-4, -90), (8.5, -90))
            Line((8.5, -90), (9.5, -91))
            Line((9.5, -91), (9.5, -110))
            Line((9.5, -110), (27.5, -110))
        make_face()
        with Locations(Location((28.5, 30, 0), (0, 0, 270))):
            Circle(SZKIC17_R, mode=Mode.SUBTRACT)
        with Locations(Location((-14.5, 30, 0), (0, 0, 270))):
            Circle(SZKIC17_R, mode=Mode.SUBTRACT)
        with Locations(Location((13.5, 30, 0), (0, 0, 270))):
            Circle(SZKIC17_R, mode=Mode.SUBTRACT)
        with Locations(Location((-5.5, 0, 0), (0, 0, 270))):
            Circle(SZKIC17_R_2, mode=Mode.SUBTRACT)
        with Locations(Location((28.5, -30, 0), (0, 0, 270))):
            Circle(SZKIC17_R, mode=Mode.SUBTRACT)
        with Locations(Location((13.5, -30, 0), (0, 0, 270))):
            Circle(SZKIC17_R, mode=Mode.SUBTRACT)
        with Locations(Location((-14.5, -30, 0), (0, 0, 270))):
            Circle(SZKIC17_R, mode=Mode.SUBTRACT)
    extrude(amount=DODANIE_WYCI_GNI_CIE6_DEPTH)

    # Szkic18 → Dodanie-wyciągnięcie7 (add)
    # profile 1 of 2: a face of its own
    with BuildSketch(Plane(origin=(27.5, 0, 0), x_dir=(0, 0, -1), z_dir=(1, 0, 0))):
        with Locations((85, 8.5)):
            Rectangle(SZKIC18_W, SZKIC18_H)
        with Locations((74.9, 5)):
            Circle(SZKIC18_R, mode=Mode.SUBTRACT)
    # profile 2 of 2: a face of its own
    with BuildSketch(Plane(origin=(27.5, 0, 0), x_dir=(0, 0, -1), z_dir=(1, 0, 0))):
        with Locations((-85, 8.5)):
            Rectangle(SZKIC18_W, SZKIC18_H)
        with Locations((-74.9, 5)):
            Circle(SZKIC18_R, mode=Mode.SUBTRACT)
    extrude(amount=DODANIE_WYCI_GNI_CIE7_DEPTH)

    # Sfazowanie3
    sfazowanie3_edges = [part.edges().sort_by_distance(p)[0] for p in [
        (27.5, 7.5, -60),
        (27.5, 8.5, 60),
    ]]
    chamfer(sfazowanie3_edges, length=SFAZOWANIE3_SIZE - 0.0001)  # a hair under: the kernel refuses the full size


solid = part.part
